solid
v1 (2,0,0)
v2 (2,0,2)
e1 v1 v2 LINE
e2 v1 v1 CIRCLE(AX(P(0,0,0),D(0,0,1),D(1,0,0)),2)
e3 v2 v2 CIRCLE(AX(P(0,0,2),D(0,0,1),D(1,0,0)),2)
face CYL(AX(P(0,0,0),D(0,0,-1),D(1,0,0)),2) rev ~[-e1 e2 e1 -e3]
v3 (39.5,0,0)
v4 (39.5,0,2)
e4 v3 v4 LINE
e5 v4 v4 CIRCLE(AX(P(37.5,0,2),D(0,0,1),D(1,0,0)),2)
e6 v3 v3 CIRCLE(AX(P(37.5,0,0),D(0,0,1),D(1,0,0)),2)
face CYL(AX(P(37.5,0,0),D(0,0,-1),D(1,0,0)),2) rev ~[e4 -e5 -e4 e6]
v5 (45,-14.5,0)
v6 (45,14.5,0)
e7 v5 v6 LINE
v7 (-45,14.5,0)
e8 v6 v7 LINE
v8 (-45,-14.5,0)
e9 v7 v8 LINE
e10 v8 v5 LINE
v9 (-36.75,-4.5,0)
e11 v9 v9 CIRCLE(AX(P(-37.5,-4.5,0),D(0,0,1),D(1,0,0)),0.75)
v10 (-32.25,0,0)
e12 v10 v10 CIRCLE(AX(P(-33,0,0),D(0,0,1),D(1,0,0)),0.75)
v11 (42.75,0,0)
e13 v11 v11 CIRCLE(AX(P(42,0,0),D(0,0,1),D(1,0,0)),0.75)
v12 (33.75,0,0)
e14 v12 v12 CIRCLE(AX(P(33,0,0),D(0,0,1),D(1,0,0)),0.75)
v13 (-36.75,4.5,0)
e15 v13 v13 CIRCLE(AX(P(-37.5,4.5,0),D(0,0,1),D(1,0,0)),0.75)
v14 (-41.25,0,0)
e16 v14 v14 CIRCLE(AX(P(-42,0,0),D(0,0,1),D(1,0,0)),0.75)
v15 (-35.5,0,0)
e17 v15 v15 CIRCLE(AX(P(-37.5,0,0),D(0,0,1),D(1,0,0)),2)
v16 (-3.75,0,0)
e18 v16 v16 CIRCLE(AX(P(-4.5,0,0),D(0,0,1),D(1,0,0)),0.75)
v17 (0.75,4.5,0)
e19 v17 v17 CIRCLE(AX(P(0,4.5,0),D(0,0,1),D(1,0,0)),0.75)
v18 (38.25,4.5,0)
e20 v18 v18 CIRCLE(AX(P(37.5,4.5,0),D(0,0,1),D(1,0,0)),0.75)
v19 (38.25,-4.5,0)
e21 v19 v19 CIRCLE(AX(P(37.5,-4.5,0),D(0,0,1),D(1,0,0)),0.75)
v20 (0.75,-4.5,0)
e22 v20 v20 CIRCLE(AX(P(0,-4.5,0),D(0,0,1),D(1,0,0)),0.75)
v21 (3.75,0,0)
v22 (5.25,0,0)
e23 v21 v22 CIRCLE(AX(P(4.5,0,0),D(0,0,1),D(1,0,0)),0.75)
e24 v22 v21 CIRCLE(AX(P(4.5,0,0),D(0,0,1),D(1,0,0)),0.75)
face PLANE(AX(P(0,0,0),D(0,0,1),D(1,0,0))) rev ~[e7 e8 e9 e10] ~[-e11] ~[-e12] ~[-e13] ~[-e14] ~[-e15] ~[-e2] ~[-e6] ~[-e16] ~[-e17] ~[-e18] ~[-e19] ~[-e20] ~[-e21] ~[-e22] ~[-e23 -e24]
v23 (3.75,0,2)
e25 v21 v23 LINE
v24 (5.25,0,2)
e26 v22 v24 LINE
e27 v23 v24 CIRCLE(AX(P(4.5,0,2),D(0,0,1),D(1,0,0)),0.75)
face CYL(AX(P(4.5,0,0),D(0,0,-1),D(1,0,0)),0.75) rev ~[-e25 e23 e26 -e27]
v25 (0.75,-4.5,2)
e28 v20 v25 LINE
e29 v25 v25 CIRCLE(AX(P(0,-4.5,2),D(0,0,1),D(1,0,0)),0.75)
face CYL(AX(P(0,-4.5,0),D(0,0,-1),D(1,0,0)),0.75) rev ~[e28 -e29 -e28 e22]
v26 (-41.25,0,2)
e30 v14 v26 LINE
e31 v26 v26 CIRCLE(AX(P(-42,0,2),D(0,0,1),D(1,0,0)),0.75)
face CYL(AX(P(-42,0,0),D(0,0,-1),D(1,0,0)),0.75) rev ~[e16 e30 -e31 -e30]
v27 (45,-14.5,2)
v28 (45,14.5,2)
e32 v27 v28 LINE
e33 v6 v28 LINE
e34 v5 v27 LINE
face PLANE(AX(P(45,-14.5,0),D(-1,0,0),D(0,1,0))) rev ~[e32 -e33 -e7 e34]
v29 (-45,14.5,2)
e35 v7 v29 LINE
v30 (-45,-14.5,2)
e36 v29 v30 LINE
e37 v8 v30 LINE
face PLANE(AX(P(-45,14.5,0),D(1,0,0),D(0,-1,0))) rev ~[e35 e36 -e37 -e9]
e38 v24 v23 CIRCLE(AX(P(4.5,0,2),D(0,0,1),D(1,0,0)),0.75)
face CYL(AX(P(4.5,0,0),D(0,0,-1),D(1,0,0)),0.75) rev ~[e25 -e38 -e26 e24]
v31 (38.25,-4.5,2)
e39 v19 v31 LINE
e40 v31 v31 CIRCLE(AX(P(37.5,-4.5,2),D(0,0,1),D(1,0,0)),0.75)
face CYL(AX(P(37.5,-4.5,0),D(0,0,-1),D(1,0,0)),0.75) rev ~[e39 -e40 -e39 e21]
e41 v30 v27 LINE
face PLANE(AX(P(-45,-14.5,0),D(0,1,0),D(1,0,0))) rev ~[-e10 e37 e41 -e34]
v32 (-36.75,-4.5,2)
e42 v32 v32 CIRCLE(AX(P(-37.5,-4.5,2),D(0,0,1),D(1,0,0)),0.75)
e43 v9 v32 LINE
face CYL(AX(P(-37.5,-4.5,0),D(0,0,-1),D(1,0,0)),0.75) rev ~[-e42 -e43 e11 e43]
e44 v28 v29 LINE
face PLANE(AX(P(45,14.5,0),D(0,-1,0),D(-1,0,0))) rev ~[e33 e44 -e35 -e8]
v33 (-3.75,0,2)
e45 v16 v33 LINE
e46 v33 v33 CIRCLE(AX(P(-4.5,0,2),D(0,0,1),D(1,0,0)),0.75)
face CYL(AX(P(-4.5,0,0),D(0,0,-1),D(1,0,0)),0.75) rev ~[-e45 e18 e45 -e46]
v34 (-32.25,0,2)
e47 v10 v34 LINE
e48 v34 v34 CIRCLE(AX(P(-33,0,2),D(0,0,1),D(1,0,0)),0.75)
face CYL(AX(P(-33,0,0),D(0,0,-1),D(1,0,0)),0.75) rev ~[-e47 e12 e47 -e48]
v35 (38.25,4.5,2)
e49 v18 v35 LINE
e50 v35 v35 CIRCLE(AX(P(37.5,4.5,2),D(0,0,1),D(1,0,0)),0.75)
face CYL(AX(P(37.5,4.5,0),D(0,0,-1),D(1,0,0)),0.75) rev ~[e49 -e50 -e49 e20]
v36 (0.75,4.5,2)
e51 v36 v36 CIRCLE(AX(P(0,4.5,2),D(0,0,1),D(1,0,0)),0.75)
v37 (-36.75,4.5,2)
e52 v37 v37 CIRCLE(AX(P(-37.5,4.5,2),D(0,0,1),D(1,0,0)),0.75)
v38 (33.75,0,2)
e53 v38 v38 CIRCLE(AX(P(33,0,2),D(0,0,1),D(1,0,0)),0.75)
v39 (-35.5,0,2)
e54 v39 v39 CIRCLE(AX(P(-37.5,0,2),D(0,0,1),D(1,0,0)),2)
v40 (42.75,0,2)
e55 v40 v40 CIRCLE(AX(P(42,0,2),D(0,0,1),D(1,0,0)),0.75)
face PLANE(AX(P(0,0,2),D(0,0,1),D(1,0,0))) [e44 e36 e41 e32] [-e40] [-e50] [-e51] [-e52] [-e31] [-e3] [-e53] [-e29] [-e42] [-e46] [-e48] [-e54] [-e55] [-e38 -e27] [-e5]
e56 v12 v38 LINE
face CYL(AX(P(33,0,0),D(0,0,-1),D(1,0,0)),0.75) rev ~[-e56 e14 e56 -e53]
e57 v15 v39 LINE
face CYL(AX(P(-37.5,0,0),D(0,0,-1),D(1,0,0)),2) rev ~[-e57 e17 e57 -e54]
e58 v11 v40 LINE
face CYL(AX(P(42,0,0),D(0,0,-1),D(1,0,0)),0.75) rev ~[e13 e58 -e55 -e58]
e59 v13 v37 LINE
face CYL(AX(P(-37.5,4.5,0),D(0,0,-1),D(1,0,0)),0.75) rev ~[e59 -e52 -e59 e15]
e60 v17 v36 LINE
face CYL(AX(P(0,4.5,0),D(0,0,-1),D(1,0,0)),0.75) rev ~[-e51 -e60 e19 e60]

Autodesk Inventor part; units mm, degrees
ref_plane "YZ Plane" through (0, 0, 0) normal (1, 0, 0) x (0, 1, 0)
ref_plane "XZ Plane" through (0, 0, 0) normal (0, 1, 0) x (-1, 0, 0)
ref_plane "XY Plane" through (0, 0, 0) normal (0, 0, 1) x (1, 0, 0)
sketch "Boceto1" plane through (0, 0, 0) normal (0, 0, 1) x (1, 0, 0)
  line L0 (-45, -14.5) -> (45, -14.5)
  line L1 (45, -14.5) -> (45, 14.5)
  line L2 (45, 14.5) -> (-45, 14.5)
  line L3 (-45, 14.5) -> (-45, -14.5)
  line L4 (45, -14.5) -> (-45, 14.5) construction
  circle A0 centre (0, 0) radius 2
  line L5 (0, 0) -> (4.5, 0) construction
  line L6 (0, 0) -> (4.5, 0)
  circle A1 centre (0, 4.5) radius 0.75
  circle A2 centre (4.5, 0) radius 0.75
  circle A3 centre (0, -4.5) radius 0.75
  circle A4 centre (-4.5, 0) radius 0.75
  circle A5 centre (-42, 0) radius 0.75
  circle A6 centre (-37.5, 0) radius 2
  circle A7 centre (-33, 0) radius 0.75
  circle A8 centre (-37.5, 4.5) radius 0.75
  circle A9 centre (-37.5, -4.5) radius 0.75
  circle A10 centre (37.5, 0) radius 2
  circle A11 centre (42, 0) radius 0.75
  circle A12 centre (37.5, 4.5) radius 0.75
  circle A13 centre (33, 0) radius 0.75
  circle A14 centre (37.5, -4.5) radius 0.75
  dimension "d0" = 90
  dimension "d1" = 29
  dimension "d2" = 4
  dimension "d8" = 1.5
  dimension "d9" = 1.5
  dimension "d10" = 1.5
  dimension "d11" = 1.5
  dimension "d23" = 4
  dimension "d25" = 1.5
  dimension "d28" = 1.5
  dimension "d29" = 1.5
  dimension "d35" = 4
  dimension "d36" = 1.5
  dimension "d37" = 1.5
  dimension "d38" = 1.5
  dimension "d39" = 1.5
extrude "Extrusión1" add sketch "Boceto1" along normal blind 2
properties part number "frontal2" material "Acero, galvanizado"
